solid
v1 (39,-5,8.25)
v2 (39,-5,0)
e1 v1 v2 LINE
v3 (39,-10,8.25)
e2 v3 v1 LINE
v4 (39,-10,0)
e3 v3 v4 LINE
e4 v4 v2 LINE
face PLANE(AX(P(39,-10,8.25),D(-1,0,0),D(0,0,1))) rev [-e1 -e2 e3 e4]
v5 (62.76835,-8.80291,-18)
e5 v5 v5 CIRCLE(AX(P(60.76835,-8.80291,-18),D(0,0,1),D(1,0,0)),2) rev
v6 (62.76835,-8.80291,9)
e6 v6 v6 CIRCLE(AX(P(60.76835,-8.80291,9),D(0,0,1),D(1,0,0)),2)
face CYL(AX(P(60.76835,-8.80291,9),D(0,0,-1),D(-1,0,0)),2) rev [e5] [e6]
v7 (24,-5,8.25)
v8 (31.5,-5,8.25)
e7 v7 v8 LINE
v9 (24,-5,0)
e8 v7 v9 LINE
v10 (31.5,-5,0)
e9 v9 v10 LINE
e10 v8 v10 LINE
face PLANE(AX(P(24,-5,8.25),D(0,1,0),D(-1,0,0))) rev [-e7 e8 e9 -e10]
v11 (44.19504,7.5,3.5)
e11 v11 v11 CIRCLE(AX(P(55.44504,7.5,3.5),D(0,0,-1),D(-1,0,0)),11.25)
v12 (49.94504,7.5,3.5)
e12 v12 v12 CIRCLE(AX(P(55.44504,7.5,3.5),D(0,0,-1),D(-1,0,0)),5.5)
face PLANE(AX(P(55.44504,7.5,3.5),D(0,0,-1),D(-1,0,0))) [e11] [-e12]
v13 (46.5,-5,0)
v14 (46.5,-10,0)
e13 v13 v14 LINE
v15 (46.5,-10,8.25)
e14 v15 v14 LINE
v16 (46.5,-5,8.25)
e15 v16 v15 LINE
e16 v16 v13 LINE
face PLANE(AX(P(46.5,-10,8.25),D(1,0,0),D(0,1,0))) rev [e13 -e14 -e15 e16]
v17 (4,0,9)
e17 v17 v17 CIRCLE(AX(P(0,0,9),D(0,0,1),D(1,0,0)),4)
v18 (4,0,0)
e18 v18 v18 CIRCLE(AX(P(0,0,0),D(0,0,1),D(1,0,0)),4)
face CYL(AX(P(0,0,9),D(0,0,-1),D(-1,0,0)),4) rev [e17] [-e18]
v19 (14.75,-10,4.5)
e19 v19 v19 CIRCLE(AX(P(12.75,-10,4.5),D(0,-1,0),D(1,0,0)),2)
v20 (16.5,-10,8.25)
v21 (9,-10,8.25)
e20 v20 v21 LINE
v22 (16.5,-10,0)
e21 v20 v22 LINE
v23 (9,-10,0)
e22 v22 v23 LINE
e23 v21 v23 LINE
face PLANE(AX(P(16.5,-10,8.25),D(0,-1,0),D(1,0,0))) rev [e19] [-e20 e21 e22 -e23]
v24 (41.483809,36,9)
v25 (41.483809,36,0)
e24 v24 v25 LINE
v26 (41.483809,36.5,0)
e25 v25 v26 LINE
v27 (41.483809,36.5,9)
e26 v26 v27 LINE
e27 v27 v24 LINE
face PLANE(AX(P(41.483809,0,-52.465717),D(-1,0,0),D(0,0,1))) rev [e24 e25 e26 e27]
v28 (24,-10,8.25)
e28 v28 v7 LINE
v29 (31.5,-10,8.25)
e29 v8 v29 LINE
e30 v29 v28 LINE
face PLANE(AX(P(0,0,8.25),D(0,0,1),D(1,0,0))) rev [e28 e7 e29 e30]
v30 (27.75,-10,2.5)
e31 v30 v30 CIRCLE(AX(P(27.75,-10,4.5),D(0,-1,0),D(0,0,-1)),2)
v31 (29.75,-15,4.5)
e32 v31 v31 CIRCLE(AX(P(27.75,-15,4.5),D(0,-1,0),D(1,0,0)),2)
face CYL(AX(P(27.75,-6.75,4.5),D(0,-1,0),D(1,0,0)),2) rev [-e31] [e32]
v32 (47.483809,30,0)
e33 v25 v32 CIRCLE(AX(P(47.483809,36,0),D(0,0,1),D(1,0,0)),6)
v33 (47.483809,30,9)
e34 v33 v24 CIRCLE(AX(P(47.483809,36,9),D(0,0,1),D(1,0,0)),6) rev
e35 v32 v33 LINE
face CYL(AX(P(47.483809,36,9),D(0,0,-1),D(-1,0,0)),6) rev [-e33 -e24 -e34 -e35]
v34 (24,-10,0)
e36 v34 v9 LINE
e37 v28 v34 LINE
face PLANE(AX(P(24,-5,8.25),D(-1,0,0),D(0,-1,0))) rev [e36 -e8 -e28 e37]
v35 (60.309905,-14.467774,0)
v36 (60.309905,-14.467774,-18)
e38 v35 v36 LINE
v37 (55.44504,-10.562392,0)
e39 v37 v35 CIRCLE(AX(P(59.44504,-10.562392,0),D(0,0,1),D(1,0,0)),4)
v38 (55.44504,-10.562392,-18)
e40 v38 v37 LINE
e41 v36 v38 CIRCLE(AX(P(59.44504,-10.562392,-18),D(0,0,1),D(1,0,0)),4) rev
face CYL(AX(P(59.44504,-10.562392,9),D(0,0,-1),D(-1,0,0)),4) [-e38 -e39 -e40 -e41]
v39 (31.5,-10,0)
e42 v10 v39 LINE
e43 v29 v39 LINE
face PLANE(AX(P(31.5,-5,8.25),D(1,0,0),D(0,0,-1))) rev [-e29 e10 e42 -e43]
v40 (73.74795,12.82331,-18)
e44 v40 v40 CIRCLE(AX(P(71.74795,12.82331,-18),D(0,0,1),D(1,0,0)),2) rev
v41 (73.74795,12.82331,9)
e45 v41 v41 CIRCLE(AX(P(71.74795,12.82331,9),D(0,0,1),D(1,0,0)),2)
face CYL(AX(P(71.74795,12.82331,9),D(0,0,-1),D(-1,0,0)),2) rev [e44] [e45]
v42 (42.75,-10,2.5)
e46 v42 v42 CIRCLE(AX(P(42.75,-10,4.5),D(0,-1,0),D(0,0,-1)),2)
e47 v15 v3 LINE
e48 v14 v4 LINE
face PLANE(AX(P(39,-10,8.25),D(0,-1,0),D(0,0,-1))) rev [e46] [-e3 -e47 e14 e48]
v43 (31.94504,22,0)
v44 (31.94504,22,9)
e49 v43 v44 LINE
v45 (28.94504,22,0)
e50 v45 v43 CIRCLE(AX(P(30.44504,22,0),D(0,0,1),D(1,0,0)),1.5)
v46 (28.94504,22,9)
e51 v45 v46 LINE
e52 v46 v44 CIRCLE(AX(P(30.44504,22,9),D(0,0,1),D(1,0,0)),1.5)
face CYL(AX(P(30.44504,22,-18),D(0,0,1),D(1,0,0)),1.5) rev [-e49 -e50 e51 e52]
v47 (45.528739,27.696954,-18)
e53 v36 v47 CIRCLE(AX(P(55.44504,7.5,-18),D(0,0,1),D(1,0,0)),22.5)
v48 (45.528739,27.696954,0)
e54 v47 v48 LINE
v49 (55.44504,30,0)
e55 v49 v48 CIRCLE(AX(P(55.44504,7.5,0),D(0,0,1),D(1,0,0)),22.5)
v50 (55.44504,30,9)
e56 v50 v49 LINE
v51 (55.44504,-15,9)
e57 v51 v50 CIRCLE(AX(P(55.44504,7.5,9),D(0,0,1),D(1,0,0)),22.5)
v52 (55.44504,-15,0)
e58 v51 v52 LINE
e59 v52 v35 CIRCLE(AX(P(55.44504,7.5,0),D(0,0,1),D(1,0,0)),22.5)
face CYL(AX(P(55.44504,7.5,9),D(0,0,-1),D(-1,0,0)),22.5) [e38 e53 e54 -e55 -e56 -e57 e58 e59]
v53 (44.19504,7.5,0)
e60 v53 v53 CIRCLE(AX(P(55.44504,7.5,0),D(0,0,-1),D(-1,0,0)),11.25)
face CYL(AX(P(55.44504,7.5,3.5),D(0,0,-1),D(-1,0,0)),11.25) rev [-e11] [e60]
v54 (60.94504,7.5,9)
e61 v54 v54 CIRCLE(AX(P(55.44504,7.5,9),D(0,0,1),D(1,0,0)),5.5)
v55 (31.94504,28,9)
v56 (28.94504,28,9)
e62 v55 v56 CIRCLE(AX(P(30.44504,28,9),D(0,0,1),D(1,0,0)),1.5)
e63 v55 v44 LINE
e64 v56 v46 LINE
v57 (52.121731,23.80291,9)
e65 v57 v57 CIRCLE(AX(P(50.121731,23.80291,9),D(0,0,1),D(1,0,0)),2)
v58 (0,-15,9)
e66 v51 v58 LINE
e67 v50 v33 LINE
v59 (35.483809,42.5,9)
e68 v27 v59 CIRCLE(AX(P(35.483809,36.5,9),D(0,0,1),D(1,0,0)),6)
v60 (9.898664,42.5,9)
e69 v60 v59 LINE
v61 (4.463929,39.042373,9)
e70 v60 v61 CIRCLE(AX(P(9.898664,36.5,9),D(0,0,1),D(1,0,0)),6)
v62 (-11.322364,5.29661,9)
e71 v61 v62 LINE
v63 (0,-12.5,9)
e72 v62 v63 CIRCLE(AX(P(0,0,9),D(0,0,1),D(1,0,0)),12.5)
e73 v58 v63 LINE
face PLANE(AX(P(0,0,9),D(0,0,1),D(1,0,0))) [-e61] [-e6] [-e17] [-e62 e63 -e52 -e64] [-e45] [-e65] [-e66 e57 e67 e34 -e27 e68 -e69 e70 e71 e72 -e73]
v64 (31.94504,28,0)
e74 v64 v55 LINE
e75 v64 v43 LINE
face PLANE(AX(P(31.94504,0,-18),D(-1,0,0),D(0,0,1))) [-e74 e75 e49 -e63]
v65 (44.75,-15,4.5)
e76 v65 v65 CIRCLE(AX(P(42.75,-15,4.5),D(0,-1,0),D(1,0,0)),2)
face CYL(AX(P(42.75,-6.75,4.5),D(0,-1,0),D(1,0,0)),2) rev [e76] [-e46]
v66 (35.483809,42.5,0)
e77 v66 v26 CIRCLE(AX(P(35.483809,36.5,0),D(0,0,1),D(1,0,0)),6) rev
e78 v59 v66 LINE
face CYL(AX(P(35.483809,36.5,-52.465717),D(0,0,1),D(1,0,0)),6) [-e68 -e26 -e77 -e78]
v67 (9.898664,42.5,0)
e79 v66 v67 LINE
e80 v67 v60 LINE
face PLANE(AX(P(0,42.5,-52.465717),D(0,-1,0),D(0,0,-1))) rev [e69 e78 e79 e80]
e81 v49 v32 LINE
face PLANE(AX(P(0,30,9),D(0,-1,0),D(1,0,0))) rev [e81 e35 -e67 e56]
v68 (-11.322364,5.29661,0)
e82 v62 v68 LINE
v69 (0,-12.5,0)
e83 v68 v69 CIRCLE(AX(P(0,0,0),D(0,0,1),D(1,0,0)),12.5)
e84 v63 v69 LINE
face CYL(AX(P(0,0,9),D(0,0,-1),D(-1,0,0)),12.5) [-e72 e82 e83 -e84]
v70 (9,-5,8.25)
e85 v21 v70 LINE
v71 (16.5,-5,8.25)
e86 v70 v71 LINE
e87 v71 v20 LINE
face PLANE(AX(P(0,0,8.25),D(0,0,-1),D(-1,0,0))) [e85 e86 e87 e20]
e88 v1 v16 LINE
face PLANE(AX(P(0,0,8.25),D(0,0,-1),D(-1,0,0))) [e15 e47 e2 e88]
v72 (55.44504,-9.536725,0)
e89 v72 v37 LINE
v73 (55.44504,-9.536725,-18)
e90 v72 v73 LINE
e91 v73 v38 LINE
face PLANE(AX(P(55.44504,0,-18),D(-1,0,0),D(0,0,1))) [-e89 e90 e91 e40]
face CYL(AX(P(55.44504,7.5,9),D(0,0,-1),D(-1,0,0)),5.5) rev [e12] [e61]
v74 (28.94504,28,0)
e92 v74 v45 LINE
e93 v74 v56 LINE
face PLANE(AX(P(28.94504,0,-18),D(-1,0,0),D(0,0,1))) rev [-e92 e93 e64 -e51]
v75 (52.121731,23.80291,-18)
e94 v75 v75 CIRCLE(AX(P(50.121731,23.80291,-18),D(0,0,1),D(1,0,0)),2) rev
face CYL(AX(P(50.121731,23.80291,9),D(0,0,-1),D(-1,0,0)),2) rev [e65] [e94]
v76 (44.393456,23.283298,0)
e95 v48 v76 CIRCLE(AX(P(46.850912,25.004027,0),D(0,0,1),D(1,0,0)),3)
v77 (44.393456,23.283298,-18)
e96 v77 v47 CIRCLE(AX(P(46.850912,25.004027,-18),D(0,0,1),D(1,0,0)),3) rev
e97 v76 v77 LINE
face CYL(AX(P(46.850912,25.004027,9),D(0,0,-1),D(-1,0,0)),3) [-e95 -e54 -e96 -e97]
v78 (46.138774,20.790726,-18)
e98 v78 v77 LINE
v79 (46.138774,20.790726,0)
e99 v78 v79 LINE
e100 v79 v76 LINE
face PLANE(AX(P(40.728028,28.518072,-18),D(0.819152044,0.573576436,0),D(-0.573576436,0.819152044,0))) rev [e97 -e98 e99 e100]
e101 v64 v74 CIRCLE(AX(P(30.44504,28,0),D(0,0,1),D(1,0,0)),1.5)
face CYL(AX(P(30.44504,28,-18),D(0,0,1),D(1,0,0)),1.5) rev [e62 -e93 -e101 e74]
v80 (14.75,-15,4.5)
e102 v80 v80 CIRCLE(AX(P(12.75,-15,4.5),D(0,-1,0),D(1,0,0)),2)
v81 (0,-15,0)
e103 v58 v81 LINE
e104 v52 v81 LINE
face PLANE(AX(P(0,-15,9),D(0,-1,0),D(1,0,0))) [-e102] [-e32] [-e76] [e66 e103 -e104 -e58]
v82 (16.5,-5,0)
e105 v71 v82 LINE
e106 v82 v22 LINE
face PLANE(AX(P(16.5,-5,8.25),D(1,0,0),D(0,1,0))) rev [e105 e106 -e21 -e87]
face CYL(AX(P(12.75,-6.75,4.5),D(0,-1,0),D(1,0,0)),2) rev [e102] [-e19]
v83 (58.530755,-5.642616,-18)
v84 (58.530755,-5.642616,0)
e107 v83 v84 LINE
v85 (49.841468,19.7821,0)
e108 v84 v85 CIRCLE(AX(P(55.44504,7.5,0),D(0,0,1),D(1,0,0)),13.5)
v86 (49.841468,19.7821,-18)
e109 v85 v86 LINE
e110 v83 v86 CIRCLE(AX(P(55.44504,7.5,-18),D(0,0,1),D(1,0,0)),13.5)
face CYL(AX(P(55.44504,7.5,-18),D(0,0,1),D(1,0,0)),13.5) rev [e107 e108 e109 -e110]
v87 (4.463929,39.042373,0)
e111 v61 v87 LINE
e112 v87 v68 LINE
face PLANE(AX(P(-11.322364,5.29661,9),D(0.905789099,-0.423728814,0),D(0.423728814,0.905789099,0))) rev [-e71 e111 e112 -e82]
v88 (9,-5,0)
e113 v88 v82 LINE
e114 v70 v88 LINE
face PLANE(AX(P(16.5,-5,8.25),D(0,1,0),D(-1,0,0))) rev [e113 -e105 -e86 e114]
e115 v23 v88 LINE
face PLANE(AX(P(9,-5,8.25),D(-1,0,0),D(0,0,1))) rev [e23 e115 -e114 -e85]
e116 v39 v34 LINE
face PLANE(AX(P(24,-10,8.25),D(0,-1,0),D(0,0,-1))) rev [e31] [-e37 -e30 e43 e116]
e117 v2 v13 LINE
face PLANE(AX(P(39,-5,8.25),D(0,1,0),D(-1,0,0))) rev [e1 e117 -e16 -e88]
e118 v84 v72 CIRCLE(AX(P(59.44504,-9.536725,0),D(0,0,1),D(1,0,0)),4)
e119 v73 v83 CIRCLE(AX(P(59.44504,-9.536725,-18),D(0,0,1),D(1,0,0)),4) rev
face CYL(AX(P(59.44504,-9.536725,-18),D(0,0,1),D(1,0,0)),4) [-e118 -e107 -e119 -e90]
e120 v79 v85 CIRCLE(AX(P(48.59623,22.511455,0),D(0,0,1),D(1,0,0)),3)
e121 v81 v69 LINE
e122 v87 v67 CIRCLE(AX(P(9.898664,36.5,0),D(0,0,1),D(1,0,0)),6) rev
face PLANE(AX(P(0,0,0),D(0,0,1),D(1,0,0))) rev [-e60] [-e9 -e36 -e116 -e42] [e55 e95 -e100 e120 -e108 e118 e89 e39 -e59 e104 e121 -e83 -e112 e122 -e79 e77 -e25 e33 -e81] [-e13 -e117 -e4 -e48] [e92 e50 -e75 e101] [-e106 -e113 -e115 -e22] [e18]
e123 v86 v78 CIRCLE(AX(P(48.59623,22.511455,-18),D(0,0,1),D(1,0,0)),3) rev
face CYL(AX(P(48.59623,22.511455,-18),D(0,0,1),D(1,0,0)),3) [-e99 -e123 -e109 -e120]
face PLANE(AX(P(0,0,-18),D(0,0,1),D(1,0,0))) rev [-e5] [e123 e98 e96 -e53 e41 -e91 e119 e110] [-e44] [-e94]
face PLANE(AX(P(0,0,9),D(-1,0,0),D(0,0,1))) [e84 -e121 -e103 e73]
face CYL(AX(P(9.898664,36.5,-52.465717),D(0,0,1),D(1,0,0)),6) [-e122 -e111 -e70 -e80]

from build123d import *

# Parameters (mm, degrees)
SKETCH1_R               = 2
SKETCH1_R_2             = 5.5
SKETCH1_R_3             = 4
BOSS_EXTRUDE1_DEPTH     = 9
BOSS_EXTRUDE2_START     = -27
BOSS_EXTRUDE2_OUTLINE_R = 2
BOSS_EXTRUDE2_DEPTH     = 18
FILLET1_R               = 4
FILLET2_R               = 3
SKETCH3_R               = 11.25
CUT_EXTRUDE1_DEPTH      = 3.5
BOSS_EXTRUDE3_START     = -9
BOSS_EXTRUDE3_DEPTH     = 9
CUT_EXTRUDE2_DEPTH      = 93.793746104
CUT_EXTRUDE2_DEPTH_BACK = 93.793746104
SKETCH7_W               = 7.5
SKETCH7_H               = 5
CUT_EXTRUDE3_DEPTH      = 8.25
SKETCH8_R               = 2
CUT_EXTRUDE5_DEPTH      = 8.25
FILLET4_R               = 6


# Read off the part's stored shape, not the designer's step: Boss-Extrude2
with BuildPart() as part:
    # Sketch1 → Boss-Extrude1 (new body)
    with BuildSketch(Plane.XY):
        with BuildLine():
            Line((0, -15), (55.445040355, -15))
            ThreePointArc((55.445040355, -15), (77.945040355, 7.5), (55.445040355, 30))
            Line((55.445040355, 30), (12.958080577, 30))
            ThreePointArc((12.958080577, 30), (2.222427952, 26.874411477), (-5.157701411, 18.474576271))
            Line((-5.157701411, 18.474576271), (-11.322363742, 5.296610169))
            ThreePointArc((-11.322363742, 5.296610169), (-10.546507173, -6.709782891), (0, -12.5))
            Line((0, -12.5), (0, -15))
        make_face()
        with Locations((50.121730514, 23.802909935)):
            Circle(SKETCH1_R, mode=Mode.SUBTRACT)
        with Locations((60.768350196, -8.802909935)):
            Circle(SKETCH1_R, mode=Mode.SUBTRACT)
        with Locations((55.445040355, 7.5)):
            Circle(SKETCH1_R_2, mode=Mode.SUBTRACT)
        with Locations((71.74795029, 12.823309841)):
            Circle(SKETCH1_R, mode=Mode.SUBTRACT)
        Circle(SKETCH1_R_3, mode=Mode.SUBTRACT)
    extrude(amount=BOSS_EXTRUDE1_DEPTH)

    # Boss-Extrude2 outline → Boss-Extrude2 (add)
    with BuildSketch(Plane.XY.offset(9).offset(BOSS_EXTRUDE2_START)):
        with BuildLine():
            ThreePointArc((55.445040355, -15), (76.903671747, 14.265880489), (42.539570537, 25.930920997))
            Line((42.539570537, 25.930920997), (47.701758465, 18.558552598))
            ThreePointArc((47.701758465, 18.558552598), (68.32021919, 11.559528293), (55.445040355, -6))
            Line((55.445040355, -6), (55.445040355, -15))
        make_face()
        with Locations((60.768350196, -8.802909935)):
            Circle(BOSS_EXTRUDE2_OUTLINE_R, mode=Mode.SUBTRACT)
        with Locations((50.121730514, 23.802909935)):
            Circle(BOSS_EXTRUDE2_OUTLINE_R, mode=Mode.SUBTRACT)
        with Locations((71.74795029, 12.823309841)):
            Circle(BOSS_EXTRUDE2_OUTLINE_R, mode=Mode.SUBTRACT)
    extrude(amount=BOSS_EXTRUDE2_DEPTH)

    # Fillet1
    fillet1_edges = [part.edges().sort_by_distance(p)[0] for p in [
        (55.445040355, -6, -9),
        (55.445040355, -15, -9),
    ]]
    fillet(fillet1_edges, radius=FILLET1_R)

    # Fillet2
    fillet2_edges = [part.edges().sort_by_distance(p)[0] for p in [
        (47.701758465, 18.558552598, -9),
        (42.539570537, 25.930920997, -9),
    ]]
    fillet(fillet2_edges, radius=FILLET2_R)

    # Sketch3 → Cut-Extrude1 (cut)
    with BuildSketch(Plane(origin=(0, 0, 0), x_dir=(-1, 0, 0), z_dir=(0, 0, -1))):
        with Locations((-55.445040355, 7.5)):
            Circle(SKETCH3_R)
    extrude(amount=-CUT_EXTRUDE1_DEPTH, mode=Mode.SUBTRACT)

    # Sketch5 → Boss-Extrude3 (add)
    with BuildSketch(Plane.XY.offset(9).offset(BOSS_EXTRUDE3_START)):
        with BuildLine():
            Line((41.483809243, 30), (41.483809243, 42.5))
            Line((41.483809243, 42.5), (12.958080577, 42.5))
            Line((12.958080577, 42.5), (6.081409657, 42.5))
            Line((6.081409657, 42.5), (-5.157701411, 18.474576271))
            ThreePointArc((-5.157701411, 18.474576271), (2.222427952, 26.874411477), (12.958080577, 30))
            Line((12.958080577, 30), (41.483809243, 30))
        make_face()
    extrude(amount=BOSS_EXTRUDE3_DEPTH)

    # Sketch6 → Cut-Extrude2 (cut, two sides: drawn at the far end of the back side and taken through both)
    with BuildSketch(Plane.XY.offset(9).offset(-CUT_EXTRUDE2_DEPTH_BACK)):
        with BuildLine():
            Line((31.945040355, 28), (31.945040355, 22))
            ThreePointArc((31.945040355, 22), (30.445040355, 20.5), (28.945040355, 22))
            Line((28.945040355, 22), (28.945040355, 28))
            ThreePointArc((28.945040355, 28), (30.445040355, 29.5), (31.945040355, 28))
        make_face()
    extrude(amount=CUT_EXTRUDE2_DEPTH + CUT_EXTRUDE2_DEPTH_BACK, mode=Mode.SUBTRACT)

    # Sketch7 → Cut-Extrude3 (cut)
    with BuildSketch(Plane(origin=(0, 0, 0), x_dir=(-1, 0, 0), z_dir=(0, 0, -1))):
        with Locations((-27.75, -7.5)):
            Rectangle(SKETCH7_W, SKETCH7_H)
        with Locations((-12.75, -7.5)):
            Rectangle(SKETCH7_W, SKETCH7_H)
        with Locations((-42.75, -7.5)):
            Rectangle(SKETCH7_W, SKETCH7_H)
    extrude(amount=-CUT_EXTRUDE3_DEPTH, mode=Mode.SUBTRACT)

    # Sketch8 → Cut-Extrude5 (cut)
    with BuildSketch(Plane.XZ.offset(15)):
        with Locations((42.75, 4.5)):
            Circle(SKETCH8_R)
        with Locations((27.75, 4.5)):
            Circle(SKETCH8_R)
        with Locations((12.75, 4.5)):
            Circle(SKETCH8_R)
    extrude(amount=-CUT_EXTRUDE5_DEPTH, mode=Mode.SUBTRACT)

    # Fillet4
    fillet4_edges = [part.edges().sort_by_distance(p)[0] for p in [
        (41.483809243, 30, 4.5),
        (41.483809243, 42.5, 4.5),
        (6.081409657, 42.5, 4.5),
    ]]
    fillet(fillet4_edges, radius=FILLET4_R)


solid = part.part
